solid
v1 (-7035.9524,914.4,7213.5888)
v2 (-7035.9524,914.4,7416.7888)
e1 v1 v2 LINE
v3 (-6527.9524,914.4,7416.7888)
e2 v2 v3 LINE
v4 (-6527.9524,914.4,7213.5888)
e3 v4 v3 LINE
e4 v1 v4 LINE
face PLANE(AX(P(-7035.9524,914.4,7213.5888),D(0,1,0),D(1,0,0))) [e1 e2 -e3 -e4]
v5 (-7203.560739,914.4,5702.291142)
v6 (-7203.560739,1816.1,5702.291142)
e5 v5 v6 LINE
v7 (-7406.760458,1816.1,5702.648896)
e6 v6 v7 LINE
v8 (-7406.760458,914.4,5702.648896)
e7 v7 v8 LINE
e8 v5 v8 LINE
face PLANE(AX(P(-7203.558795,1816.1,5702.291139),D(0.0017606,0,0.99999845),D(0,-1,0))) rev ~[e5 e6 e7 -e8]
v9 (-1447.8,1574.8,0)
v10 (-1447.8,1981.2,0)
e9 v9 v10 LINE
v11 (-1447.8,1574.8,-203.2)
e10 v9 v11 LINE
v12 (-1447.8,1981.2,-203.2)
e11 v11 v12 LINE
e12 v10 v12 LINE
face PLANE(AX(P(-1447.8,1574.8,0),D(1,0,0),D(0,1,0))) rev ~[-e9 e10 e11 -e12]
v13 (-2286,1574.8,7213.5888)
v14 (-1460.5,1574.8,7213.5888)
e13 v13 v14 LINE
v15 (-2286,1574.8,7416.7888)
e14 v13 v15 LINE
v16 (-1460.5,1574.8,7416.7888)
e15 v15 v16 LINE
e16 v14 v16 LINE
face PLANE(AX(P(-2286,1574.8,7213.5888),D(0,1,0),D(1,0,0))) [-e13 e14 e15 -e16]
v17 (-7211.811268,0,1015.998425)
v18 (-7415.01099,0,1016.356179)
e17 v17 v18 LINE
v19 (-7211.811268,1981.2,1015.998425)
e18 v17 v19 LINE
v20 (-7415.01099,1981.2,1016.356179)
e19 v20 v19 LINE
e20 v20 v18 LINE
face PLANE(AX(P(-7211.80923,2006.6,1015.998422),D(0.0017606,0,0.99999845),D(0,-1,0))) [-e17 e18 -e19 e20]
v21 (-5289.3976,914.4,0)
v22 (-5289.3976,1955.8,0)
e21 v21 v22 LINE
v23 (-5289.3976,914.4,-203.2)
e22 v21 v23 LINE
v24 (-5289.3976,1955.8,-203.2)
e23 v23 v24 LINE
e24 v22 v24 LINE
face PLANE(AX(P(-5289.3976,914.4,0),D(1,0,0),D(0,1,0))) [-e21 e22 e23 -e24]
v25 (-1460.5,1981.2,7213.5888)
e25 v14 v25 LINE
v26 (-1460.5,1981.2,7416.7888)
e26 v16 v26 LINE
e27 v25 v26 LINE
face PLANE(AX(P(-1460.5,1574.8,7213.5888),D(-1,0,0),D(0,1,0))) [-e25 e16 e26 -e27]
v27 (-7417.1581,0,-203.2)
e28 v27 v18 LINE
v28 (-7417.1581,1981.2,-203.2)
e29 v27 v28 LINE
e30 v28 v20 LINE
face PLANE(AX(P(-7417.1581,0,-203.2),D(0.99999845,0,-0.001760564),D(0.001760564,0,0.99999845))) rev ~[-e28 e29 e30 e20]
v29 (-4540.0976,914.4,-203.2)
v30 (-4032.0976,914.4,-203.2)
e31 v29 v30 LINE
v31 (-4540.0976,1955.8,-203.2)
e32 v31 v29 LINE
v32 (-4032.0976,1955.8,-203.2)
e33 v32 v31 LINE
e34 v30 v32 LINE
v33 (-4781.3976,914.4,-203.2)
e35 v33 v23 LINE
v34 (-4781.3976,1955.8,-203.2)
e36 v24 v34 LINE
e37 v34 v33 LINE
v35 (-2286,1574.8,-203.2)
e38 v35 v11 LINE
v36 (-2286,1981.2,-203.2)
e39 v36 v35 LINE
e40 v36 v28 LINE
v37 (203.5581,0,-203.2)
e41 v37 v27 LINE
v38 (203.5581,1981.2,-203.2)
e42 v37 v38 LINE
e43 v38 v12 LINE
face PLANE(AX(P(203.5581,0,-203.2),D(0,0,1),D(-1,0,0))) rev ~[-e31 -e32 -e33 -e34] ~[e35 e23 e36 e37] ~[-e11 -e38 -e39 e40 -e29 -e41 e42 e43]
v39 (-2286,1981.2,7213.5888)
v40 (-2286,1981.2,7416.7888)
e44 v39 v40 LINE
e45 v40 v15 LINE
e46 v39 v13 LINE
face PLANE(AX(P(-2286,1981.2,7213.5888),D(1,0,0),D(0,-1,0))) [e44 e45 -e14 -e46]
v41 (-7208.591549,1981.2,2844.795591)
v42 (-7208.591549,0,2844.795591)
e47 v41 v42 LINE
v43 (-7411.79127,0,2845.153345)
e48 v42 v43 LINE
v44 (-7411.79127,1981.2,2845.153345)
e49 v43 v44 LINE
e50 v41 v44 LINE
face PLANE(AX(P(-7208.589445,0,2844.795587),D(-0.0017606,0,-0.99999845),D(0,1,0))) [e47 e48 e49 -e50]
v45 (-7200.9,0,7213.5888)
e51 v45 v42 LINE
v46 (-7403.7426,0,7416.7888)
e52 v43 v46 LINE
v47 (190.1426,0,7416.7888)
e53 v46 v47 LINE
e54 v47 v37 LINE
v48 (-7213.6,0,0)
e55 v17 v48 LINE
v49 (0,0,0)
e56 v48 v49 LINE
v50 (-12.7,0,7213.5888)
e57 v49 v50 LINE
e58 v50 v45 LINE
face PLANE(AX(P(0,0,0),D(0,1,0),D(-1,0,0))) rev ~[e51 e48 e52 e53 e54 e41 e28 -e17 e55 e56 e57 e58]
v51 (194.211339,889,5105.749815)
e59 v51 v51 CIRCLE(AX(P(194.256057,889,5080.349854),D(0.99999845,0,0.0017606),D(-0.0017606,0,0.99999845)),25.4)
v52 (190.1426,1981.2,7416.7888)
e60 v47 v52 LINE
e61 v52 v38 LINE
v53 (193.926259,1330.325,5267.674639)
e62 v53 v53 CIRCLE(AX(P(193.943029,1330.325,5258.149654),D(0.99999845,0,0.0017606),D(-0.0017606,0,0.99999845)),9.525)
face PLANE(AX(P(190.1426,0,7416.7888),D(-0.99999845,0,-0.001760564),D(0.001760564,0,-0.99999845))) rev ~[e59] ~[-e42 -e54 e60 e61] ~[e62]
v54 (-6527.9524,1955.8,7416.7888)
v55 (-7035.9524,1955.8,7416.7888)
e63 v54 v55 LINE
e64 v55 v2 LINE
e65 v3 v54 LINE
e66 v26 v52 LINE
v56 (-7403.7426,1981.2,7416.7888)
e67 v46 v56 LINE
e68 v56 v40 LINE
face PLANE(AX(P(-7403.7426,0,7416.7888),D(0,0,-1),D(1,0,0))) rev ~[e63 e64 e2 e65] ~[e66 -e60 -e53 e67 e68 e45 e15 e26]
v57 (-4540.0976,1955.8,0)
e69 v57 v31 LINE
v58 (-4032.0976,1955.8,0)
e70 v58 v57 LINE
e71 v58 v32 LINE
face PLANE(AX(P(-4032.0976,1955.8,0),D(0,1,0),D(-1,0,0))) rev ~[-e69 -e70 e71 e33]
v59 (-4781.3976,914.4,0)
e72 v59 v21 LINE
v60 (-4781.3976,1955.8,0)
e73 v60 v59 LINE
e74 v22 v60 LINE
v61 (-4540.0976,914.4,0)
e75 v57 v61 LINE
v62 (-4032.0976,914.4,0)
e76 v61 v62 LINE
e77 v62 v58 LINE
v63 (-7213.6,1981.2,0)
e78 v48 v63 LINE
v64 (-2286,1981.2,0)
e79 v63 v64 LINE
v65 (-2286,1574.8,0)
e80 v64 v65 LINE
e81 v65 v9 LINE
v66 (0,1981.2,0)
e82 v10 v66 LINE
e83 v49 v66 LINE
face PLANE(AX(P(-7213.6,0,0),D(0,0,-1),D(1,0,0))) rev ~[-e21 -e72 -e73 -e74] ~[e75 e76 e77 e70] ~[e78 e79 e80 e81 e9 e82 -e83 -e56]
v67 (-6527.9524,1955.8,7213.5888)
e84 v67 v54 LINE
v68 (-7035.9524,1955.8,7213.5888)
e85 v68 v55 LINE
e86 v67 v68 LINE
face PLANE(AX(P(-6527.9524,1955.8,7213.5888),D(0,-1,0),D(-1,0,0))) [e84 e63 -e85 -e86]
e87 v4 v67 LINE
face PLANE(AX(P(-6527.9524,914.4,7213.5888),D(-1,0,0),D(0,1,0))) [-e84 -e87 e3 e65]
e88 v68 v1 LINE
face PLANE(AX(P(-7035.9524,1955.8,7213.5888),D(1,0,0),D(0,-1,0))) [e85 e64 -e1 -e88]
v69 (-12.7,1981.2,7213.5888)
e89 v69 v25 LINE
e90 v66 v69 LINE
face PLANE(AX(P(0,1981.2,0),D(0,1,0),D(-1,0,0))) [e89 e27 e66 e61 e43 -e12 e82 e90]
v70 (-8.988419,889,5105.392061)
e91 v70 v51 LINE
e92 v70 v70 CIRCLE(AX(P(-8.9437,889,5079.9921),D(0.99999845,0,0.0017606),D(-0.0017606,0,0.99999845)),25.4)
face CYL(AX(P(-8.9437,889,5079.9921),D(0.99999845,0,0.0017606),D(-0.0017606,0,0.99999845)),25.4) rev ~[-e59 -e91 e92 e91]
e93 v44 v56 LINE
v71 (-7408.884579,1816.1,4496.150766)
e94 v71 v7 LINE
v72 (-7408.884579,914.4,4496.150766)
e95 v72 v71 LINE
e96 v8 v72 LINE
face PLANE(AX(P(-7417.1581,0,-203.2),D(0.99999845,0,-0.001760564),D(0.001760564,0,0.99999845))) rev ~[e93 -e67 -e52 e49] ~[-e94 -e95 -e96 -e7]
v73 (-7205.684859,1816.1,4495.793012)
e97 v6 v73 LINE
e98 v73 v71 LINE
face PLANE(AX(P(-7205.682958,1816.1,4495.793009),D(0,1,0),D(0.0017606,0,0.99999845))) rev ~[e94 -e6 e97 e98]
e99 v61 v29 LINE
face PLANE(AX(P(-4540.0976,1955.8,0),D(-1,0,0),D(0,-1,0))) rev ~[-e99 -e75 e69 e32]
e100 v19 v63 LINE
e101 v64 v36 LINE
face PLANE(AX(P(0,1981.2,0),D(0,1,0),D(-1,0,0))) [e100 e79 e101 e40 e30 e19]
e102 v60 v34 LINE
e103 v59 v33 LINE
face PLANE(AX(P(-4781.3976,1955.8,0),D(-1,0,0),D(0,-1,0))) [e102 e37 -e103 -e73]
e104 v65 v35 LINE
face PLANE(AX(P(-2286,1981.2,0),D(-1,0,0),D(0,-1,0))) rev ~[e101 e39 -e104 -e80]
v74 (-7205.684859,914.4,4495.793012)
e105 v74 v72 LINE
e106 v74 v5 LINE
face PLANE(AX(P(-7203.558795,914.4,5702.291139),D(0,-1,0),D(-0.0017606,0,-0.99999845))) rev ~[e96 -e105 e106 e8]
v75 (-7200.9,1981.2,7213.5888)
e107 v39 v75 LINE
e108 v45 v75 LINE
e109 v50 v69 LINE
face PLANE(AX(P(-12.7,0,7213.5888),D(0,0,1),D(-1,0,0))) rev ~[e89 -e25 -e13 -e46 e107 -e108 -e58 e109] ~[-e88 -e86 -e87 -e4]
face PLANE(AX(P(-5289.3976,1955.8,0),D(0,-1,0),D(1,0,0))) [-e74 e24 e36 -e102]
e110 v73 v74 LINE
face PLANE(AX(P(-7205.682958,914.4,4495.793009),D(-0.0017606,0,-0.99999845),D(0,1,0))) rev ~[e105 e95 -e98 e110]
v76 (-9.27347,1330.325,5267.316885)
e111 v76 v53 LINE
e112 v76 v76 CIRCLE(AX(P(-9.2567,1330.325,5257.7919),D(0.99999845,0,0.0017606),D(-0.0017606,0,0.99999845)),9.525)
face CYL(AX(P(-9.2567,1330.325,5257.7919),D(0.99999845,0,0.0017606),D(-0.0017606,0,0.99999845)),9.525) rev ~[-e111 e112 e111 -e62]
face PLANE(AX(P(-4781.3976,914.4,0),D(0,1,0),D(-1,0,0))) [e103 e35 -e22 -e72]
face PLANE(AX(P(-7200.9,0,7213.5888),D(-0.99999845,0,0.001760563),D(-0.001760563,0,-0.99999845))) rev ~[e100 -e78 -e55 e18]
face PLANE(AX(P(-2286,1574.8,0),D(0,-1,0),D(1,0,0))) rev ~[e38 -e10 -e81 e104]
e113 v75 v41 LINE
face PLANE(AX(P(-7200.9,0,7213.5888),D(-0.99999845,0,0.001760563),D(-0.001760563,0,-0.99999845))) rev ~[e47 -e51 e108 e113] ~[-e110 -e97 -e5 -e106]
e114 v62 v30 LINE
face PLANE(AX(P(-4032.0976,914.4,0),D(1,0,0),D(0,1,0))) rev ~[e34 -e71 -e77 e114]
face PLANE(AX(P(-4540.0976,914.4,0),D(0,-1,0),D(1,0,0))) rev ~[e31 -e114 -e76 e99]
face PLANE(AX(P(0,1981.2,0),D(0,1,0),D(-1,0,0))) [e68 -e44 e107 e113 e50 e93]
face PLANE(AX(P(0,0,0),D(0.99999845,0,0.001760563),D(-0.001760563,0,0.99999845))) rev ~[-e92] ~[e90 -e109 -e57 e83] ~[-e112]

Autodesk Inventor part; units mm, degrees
ref_plane "YZ Plane" through (0, 0, 0) normal (1, 0, 0) x (0, 1, 0)
ref_plane "XZ Plane" through (0, 0, 0) normal (0, 1, 0) x (-1, 0, 0)
ref_plane "XY Plane" through (0, 0, 0) normal (0, 0, 1) x (1, 0, 0)
sketch "Sketch1" plane through (0, 0, 0) normal (0, 1, 0) x (-1, 0, 0)
  line L0 (0, 0) -> (12.7, 7213.5888)
  line L1 (12.7, 7213.5888) -> (7200.9, 7213.5888)
  line L2 (7200.9, 7213.5888) -> (7213.6, 0)
  line L3 (7213.6, 0) -> (0, 0)
  line L4 (7403.7426, 7416.7888) -> (-190.1426, 7416.7888)
  line L5 (-190.1426, 7416.7888) -> (-203.5581, -203.2)
  line L6 (-203.5581, -203.2) -> (7417.1581, -203.2)
  line L7 (7417.1581, -203.2) -> (7403.7426, 7416.7888)
  dimension "d1" = 7188.2
  dimension "d3" = 12.7
  dimension "d4" = 7213.6
  dimension "d5" = 7213.6
  dimension "d6" = 203.2
  dimension "d8" = 7213.6
extrude "Extrusion1" add sketch "Sketch1" along normal blind 1981.2
sketch "Sketch3" plane through (-12.7, 0, 7213.5888) normal (0, 0, -1) x (-1, 0, 0)
  line L0 (7391.0426, 1981.2) -> (-202.8426, 1981.2) projected
  line L1 (2273.3, 1981.2) -> (2273.3, 1574.8)
  line L2 (2273.3, 1574.8) -> (1447.8, 1574.8)
  line L3 (1447.8, 1574.8) -> (1447.8, 1981.2)
  line L4 (0, 0) -> (0, 1981.2) projected
  line L5 (0, 0) -> (7188.2, 0) projected
  line L6 (1447.8, 1981.2) -> (2273.3, 1981.2)
  point P0 (-12.7, 0)
  dimension "d20" = 1447.8
  dimension "d23" = 406.4
  dimension "d24" = 825.5
extrude "Extrusion2" cut sketch "Sketch3" against normal up to surface (203.2 mm away)
sketch "Sketch4" plane through (-12.7, 0, 7213.5888) normal (-0.9999985, 0, -0.0017606) x (-0.0017606, 0, 0.9999985)
  line L0 (-7213.6, 0) -> (0, 0) projected
  line L1 (-7213.6, 0) -> (-7213.6, 1981.2) projected
  point P0 (-1955.8, 1330.325)
  dimension "d27" = 1330.325
  dimension "d28" = 5257.8
hole "Hole1" at (-9.2567, 1330.325, 5257.7919) direction (0.9999985, 0, 0.0017606) diameter 19.05 end through all
sketch "Sketch5" plane through (-12.7, 0, 7213.5888) normal (-0.9999985, 0, -0.0017606) x (-0.0017606, 0, 0.9999985)
  line L0 (-7213.6, 0) -> (0, 0) projected
  line L1 (-7213.6, 0) -> (-7213.6, 1981.2) projected
  point P0 (-2133.6, 889)
  dimension "d36" = 889
  dimension "d37" = 5080
hole "Hole2" at (-8.9437, 889, 5079.9921) direction (0.9999985, 0, 0.0017606) diameter 50.8 end through all
sketch "Sketch6" plane through (-7213.6, 0, 0) normal (0, 0, 1) x (1, 0, 0)
  line L0 (7417.1581, 1981.2) -> (-203.5581, 1981.2) projected
  line L1 (5765.8, 1981.2) -> (4927.6, 1981.2)
  line L2 (4927.6, 1981.2) -> (4927.6, 1574.8)
  line L3 (4927.6, 1574.8) -> (5765.8, 1574.8)
  line L4 (5765.8, 1574.8) -> (5765.8, 1981.2)
  line L5 (7213.6, 0) -> (7213.6, 1981.2) projected
  line L6 (0, 0) -> (7213.6, 0) projected
  dimension "d45" = 1447.8
  dimension "d47" = 406.4
  dimension "d48" = 838.2
extrude "Extrusion3" cut sketch "Sketch6" against normal up to surface (203.2 mm away)
sketch "Sketch7" plane through (-7213.6, 0, 0) normal (0.9999985, 0, -0.0017606) x (-0.0017606, 0, -0.9999985)
  line L0 (-7213.6, 0) -> (0, 0) projected
  line L1 (-1016, 0) -> (-2844.8, 0)
  line L2 (-2844.8, 0) -> (-2844.8, 2006.6)
  line L3 (-2844.8, 2006.6) -> (-1016, 2006.6)
  line L4 (-1016, 2006.6) -> (-1016, 0)
  line L5 (0, 0) -> (0, 1981.2) projected
  point P0 (-12.7, 0)
  point P1 (-2844.8, 0)
  dimension "d51" = 1016
  dimension "d52" = 2006.6
  dimension "d53" = 1828.8
extrude "Extrusion4" cut sketch "Sketch7" against normal up to surface (203.2 mm away)
sketch "Sketch8" plane through (-7200.9, 0, 7213.5888) normal (0.9999985, 0, -0.0017606) x (-0.0017606, 0, -0.9999985)
  line L0 (2717.8, 1816.1) -> (1511.3, 1816.1)
  line L1 (1511.3, 1816.1) -> (1511.3, 914.4)
  line L2 (1511.3, 914.4) -> (2717.8, 914.4)
  line L3 (2717.8, 914.4) -> (2717.8, 1816.1)
  line L4 (0, 0) -> (0, 1981.2) projected
  line L5 (0, 0) -> (4368.8, 0) projected
  point P0 (7200.9, 0)
  dimension "d56" = 2717.8
  dimension "d57" = 1206.5
  dimension "d58" = 901.7
  dimension "d59" = 914.4
extrude "Extrusion5" cut sketch "Sketch8" against normal up to surface (203.2 mm away)
sketch "Sketch9" plane through (-7213.6, 0, 0) normal (0, 0, 1) x (1, 0, 0)
  line L0 (3181.5024, 1955.8) -> (2673.5024, 1955.8)
  line L1 (2673.5024, 1955.8) -> (2673.5024, 914.4)
  line L2 (2673.5024, 914.4) -> (3181.5024, 914.4)
  line L3 (3181.5024, 914.4) -> (3181.5024, 1955.8)
  line L4 (0, 0) -> (7213.6, 0) projected
  line L5 (7213.6, 0) -> (7213.6, 1981.2) projected
  dimension "d63" = 1041.4
  dimension "d64" = 508
  dimension "d65" = 914.4
  dimension "d66" = 4540.0976
extrude "Extrusion6" cut sketch "Sketch9" against normal up to surface (203.2 mm away)
sketch "Sketch10" plane through (-7213.6, 0, 0) normal (0, 0, 1) x (1, 0, 0)
  line L0 (2432.2024, 914.4) -> (1924.2024, 914.4)
  line L1 (1924.2024, 914.4) -> (1924.2024, 1955.8)
  line L2 (1924.2024, 1955.8) -> (2432.2024, 1955.8)
  line L3 (2432.2024, 1955.8) -> (2432.2024, 914.4)
  line L4 (0, 0) -> (7213.6, 0) projected
  line L5 (0, 0) -> (0, 1981.2) projected
  dimension "d69" = 914.4
  dimension "d70" = 1041.4
  dimension "d71" = 508
  dimension "d72" = 1924.2024
extrude "Extrusion7" cut sketch "Sketch10" against normal up to surface (203.2 mm away)
sketch "Sketch11" plane through (-12.7, 0, 7213.5888) normal (0, 0, -1) x (-1, 0, 0)
  line L0 (7023.2524, 914.4) -> (6515.2524, 914.4)
  line L1 (6515.2524, 914.4) -> (6515.2524, 1955.8)
  line L2 (6515.2524, 1955.8) -> (7023.2524, 1955.8)
  line L3 (7023.2524, 1955.8) -> (7023.2524, 914.4)
  line L4 (7188.2, 0) -> (7188.2, 1981.2) projected
  line L5 (0, 0) -> (7188.2, 0) projected
  point P0 (-12.7, 0)
  dimension "d75" = 164.9476
  dimension "d76" = 1041.4
  dimension "d79" = 508
  dimension "d80" = 914.4
extrude "Extrusion8" cut sketch "Sketch11" against normal up to surface (203.2 mm away)
properties part number "Exterior_Walls" material "Concrete"
